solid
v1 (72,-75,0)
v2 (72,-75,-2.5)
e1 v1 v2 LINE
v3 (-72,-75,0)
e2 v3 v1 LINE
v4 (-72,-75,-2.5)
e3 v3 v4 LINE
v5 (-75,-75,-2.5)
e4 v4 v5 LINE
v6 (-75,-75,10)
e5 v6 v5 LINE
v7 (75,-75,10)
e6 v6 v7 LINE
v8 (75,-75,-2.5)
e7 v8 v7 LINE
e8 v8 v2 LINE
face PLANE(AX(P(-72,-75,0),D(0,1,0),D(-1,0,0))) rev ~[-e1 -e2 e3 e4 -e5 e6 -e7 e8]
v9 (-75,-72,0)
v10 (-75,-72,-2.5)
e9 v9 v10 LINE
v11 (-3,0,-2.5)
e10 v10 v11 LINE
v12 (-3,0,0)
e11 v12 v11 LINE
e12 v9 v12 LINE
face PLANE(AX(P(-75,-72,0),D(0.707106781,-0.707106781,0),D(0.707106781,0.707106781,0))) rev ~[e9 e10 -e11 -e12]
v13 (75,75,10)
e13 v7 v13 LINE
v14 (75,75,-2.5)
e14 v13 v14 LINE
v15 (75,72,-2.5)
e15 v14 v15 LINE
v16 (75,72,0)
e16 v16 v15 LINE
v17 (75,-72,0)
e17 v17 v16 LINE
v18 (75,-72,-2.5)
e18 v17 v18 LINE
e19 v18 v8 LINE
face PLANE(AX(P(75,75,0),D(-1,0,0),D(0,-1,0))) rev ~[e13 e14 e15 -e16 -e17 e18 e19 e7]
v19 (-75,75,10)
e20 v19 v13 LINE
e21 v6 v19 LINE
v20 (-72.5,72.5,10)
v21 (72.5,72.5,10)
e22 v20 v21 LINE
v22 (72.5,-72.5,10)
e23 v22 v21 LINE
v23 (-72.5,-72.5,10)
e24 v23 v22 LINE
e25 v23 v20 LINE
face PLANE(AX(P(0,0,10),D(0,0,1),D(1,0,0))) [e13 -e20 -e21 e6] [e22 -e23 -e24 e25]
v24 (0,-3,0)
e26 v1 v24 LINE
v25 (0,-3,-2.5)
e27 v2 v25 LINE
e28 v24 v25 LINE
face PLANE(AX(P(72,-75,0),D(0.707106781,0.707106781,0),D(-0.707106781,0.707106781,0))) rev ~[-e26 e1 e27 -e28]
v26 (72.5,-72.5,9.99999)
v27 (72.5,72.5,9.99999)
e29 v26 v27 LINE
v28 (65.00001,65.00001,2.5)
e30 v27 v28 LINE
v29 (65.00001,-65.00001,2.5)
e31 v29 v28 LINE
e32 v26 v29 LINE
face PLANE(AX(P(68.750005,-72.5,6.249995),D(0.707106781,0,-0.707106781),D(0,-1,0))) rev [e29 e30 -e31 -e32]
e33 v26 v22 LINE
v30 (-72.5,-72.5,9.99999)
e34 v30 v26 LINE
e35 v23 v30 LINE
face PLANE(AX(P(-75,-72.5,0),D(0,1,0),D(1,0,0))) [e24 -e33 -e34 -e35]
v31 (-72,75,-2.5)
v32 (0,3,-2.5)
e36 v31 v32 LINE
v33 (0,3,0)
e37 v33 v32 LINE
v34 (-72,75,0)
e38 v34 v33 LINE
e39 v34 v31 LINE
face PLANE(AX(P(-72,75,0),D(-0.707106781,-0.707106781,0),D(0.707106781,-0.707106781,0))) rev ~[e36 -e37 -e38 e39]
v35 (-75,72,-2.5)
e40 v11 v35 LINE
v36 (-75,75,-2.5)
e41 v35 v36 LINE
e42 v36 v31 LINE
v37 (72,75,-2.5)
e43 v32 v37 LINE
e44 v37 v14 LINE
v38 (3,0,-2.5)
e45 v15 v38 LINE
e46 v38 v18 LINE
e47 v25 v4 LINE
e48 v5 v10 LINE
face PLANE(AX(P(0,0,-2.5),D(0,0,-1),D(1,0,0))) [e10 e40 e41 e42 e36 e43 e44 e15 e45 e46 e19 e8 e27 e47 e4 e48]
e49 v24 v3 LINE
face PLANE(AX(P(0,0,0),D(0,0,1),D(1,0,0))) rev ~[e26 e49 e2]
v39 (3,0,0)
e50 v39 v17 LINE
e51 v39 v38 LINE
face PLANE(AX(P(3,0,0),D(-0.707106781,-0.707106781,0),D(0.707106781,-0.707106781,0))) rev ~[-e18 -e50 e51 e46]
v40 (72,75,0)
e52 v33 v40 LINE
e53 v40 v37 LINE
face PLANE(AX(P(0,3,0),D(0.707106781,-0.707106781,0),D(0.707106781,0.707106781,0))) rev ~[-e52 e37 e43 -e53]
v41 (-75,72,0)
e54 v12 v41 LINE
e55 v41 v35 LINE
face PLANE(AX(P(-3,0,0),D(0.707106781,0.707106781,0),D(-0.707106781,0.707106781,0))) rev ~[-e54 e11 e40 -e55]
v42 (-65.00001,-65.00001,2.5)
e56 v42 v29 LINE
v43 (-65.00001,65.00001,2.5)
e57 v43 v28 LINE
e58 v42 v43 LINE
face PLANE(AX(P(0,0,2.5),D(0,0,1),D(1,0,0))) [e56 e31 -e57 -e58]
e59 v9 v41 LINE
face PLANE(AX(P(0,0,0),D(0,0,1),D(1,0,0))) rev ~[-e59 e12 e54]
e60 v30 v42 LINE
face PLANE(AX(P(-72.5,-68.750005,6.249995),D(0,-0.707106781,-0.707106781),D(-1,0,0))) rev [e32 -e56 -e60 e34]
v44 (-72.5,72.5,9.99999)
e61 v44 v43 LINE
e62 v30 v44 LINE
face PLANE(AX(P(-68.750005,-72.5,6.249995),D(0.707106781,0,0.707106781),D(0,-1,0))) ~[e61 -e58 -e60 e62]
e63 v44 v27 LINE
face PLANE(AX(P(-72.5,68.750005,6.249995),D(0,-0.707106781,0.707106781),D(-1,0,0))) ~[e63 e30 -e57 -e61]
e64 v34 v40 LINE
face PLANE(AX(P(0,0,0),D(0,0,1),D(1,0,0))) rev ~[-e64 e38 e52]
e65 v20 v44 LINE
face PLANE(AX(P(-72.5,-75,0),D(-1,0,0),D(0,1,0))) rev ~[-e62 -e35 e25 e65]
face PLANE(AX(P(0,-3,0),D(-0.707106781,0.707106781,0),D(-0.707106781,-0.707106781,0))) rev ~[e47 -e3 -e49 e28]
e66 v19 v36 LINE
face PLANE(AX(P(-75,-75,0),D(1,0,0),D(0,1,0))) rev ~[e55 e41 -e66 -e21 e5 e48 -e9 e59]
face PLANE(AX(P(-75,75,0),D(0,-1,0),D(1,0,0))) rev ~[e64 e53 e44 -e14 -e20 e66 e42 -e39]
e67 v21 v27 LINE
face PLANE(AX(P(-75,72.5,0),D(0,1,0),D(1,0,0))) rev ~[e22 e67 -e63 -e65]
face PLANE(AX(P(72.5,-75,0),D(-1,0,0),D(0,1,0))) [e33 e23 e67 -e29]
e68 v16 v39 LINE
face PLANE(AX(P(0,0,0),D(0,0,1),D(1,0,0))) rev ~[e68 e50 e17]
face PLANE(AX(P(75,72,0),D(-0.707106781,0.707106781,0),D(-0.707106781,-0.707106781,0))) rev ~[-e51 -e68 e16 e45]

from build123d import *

# Parameters (mm, degrees)
F0_W     = 150
F0_H     = 150
F1_DEPTH = 10
F2_T     = -2.5
F3_SIZE  = 7.49999
F5_DEPTH = 2.5


# Not quite as in the source:
# - a fillet or chamfer is up to 0.001 mm smaller than in the source, because OpenCascade refuses the exact size


with BuildPart() as f1:
    # F0 (on Top) → F1 (new body)
    with BuildSketch(Plane.XY):
        Rectangle(F0_W, F0_H)
    extrude(amount=F1_DEPTH)

    # F2
    f2_openings = [f1.faces().sort_by_distance(p)[0] for p in [
        (0, 0, 10),
    ]]
    offset(amount=F2_T, openings=f2_openings)

    # F3 (size 7.5 in the source; OpenCascade refuses exactly that, so slightly less here)
    f3_edges = [f1.edges().sort_by_distance(p)[0] for p in [
        (-72.5, 0, 2.5),
        (0, 72.5, 2.5),
        (72.5, 0, 2.5),
        (0, -72.5, 2.5),
    ]]
    chamfer(f3_edges, length=F3_SIZE)

    # F4 (on face) → F5 (join)
    with BuildSketch(Plane(origin=(0, 0, 0), x_dir=(1, 0, 0), z_dir=(0, 0, -1))):
        Polygon((0, 3), (-72, 75), (-75, 75), (-75, 72), (-3, 0), (-75, -72), (-75, -75), (-72, -75), (0, -3), (72, -75), (75, -75), (75, -72), (3, 0), (75, 72), (75, 75), (72, 75), align=None)
    extrude(amount=F5_DEPTH)


solid = f1.part
